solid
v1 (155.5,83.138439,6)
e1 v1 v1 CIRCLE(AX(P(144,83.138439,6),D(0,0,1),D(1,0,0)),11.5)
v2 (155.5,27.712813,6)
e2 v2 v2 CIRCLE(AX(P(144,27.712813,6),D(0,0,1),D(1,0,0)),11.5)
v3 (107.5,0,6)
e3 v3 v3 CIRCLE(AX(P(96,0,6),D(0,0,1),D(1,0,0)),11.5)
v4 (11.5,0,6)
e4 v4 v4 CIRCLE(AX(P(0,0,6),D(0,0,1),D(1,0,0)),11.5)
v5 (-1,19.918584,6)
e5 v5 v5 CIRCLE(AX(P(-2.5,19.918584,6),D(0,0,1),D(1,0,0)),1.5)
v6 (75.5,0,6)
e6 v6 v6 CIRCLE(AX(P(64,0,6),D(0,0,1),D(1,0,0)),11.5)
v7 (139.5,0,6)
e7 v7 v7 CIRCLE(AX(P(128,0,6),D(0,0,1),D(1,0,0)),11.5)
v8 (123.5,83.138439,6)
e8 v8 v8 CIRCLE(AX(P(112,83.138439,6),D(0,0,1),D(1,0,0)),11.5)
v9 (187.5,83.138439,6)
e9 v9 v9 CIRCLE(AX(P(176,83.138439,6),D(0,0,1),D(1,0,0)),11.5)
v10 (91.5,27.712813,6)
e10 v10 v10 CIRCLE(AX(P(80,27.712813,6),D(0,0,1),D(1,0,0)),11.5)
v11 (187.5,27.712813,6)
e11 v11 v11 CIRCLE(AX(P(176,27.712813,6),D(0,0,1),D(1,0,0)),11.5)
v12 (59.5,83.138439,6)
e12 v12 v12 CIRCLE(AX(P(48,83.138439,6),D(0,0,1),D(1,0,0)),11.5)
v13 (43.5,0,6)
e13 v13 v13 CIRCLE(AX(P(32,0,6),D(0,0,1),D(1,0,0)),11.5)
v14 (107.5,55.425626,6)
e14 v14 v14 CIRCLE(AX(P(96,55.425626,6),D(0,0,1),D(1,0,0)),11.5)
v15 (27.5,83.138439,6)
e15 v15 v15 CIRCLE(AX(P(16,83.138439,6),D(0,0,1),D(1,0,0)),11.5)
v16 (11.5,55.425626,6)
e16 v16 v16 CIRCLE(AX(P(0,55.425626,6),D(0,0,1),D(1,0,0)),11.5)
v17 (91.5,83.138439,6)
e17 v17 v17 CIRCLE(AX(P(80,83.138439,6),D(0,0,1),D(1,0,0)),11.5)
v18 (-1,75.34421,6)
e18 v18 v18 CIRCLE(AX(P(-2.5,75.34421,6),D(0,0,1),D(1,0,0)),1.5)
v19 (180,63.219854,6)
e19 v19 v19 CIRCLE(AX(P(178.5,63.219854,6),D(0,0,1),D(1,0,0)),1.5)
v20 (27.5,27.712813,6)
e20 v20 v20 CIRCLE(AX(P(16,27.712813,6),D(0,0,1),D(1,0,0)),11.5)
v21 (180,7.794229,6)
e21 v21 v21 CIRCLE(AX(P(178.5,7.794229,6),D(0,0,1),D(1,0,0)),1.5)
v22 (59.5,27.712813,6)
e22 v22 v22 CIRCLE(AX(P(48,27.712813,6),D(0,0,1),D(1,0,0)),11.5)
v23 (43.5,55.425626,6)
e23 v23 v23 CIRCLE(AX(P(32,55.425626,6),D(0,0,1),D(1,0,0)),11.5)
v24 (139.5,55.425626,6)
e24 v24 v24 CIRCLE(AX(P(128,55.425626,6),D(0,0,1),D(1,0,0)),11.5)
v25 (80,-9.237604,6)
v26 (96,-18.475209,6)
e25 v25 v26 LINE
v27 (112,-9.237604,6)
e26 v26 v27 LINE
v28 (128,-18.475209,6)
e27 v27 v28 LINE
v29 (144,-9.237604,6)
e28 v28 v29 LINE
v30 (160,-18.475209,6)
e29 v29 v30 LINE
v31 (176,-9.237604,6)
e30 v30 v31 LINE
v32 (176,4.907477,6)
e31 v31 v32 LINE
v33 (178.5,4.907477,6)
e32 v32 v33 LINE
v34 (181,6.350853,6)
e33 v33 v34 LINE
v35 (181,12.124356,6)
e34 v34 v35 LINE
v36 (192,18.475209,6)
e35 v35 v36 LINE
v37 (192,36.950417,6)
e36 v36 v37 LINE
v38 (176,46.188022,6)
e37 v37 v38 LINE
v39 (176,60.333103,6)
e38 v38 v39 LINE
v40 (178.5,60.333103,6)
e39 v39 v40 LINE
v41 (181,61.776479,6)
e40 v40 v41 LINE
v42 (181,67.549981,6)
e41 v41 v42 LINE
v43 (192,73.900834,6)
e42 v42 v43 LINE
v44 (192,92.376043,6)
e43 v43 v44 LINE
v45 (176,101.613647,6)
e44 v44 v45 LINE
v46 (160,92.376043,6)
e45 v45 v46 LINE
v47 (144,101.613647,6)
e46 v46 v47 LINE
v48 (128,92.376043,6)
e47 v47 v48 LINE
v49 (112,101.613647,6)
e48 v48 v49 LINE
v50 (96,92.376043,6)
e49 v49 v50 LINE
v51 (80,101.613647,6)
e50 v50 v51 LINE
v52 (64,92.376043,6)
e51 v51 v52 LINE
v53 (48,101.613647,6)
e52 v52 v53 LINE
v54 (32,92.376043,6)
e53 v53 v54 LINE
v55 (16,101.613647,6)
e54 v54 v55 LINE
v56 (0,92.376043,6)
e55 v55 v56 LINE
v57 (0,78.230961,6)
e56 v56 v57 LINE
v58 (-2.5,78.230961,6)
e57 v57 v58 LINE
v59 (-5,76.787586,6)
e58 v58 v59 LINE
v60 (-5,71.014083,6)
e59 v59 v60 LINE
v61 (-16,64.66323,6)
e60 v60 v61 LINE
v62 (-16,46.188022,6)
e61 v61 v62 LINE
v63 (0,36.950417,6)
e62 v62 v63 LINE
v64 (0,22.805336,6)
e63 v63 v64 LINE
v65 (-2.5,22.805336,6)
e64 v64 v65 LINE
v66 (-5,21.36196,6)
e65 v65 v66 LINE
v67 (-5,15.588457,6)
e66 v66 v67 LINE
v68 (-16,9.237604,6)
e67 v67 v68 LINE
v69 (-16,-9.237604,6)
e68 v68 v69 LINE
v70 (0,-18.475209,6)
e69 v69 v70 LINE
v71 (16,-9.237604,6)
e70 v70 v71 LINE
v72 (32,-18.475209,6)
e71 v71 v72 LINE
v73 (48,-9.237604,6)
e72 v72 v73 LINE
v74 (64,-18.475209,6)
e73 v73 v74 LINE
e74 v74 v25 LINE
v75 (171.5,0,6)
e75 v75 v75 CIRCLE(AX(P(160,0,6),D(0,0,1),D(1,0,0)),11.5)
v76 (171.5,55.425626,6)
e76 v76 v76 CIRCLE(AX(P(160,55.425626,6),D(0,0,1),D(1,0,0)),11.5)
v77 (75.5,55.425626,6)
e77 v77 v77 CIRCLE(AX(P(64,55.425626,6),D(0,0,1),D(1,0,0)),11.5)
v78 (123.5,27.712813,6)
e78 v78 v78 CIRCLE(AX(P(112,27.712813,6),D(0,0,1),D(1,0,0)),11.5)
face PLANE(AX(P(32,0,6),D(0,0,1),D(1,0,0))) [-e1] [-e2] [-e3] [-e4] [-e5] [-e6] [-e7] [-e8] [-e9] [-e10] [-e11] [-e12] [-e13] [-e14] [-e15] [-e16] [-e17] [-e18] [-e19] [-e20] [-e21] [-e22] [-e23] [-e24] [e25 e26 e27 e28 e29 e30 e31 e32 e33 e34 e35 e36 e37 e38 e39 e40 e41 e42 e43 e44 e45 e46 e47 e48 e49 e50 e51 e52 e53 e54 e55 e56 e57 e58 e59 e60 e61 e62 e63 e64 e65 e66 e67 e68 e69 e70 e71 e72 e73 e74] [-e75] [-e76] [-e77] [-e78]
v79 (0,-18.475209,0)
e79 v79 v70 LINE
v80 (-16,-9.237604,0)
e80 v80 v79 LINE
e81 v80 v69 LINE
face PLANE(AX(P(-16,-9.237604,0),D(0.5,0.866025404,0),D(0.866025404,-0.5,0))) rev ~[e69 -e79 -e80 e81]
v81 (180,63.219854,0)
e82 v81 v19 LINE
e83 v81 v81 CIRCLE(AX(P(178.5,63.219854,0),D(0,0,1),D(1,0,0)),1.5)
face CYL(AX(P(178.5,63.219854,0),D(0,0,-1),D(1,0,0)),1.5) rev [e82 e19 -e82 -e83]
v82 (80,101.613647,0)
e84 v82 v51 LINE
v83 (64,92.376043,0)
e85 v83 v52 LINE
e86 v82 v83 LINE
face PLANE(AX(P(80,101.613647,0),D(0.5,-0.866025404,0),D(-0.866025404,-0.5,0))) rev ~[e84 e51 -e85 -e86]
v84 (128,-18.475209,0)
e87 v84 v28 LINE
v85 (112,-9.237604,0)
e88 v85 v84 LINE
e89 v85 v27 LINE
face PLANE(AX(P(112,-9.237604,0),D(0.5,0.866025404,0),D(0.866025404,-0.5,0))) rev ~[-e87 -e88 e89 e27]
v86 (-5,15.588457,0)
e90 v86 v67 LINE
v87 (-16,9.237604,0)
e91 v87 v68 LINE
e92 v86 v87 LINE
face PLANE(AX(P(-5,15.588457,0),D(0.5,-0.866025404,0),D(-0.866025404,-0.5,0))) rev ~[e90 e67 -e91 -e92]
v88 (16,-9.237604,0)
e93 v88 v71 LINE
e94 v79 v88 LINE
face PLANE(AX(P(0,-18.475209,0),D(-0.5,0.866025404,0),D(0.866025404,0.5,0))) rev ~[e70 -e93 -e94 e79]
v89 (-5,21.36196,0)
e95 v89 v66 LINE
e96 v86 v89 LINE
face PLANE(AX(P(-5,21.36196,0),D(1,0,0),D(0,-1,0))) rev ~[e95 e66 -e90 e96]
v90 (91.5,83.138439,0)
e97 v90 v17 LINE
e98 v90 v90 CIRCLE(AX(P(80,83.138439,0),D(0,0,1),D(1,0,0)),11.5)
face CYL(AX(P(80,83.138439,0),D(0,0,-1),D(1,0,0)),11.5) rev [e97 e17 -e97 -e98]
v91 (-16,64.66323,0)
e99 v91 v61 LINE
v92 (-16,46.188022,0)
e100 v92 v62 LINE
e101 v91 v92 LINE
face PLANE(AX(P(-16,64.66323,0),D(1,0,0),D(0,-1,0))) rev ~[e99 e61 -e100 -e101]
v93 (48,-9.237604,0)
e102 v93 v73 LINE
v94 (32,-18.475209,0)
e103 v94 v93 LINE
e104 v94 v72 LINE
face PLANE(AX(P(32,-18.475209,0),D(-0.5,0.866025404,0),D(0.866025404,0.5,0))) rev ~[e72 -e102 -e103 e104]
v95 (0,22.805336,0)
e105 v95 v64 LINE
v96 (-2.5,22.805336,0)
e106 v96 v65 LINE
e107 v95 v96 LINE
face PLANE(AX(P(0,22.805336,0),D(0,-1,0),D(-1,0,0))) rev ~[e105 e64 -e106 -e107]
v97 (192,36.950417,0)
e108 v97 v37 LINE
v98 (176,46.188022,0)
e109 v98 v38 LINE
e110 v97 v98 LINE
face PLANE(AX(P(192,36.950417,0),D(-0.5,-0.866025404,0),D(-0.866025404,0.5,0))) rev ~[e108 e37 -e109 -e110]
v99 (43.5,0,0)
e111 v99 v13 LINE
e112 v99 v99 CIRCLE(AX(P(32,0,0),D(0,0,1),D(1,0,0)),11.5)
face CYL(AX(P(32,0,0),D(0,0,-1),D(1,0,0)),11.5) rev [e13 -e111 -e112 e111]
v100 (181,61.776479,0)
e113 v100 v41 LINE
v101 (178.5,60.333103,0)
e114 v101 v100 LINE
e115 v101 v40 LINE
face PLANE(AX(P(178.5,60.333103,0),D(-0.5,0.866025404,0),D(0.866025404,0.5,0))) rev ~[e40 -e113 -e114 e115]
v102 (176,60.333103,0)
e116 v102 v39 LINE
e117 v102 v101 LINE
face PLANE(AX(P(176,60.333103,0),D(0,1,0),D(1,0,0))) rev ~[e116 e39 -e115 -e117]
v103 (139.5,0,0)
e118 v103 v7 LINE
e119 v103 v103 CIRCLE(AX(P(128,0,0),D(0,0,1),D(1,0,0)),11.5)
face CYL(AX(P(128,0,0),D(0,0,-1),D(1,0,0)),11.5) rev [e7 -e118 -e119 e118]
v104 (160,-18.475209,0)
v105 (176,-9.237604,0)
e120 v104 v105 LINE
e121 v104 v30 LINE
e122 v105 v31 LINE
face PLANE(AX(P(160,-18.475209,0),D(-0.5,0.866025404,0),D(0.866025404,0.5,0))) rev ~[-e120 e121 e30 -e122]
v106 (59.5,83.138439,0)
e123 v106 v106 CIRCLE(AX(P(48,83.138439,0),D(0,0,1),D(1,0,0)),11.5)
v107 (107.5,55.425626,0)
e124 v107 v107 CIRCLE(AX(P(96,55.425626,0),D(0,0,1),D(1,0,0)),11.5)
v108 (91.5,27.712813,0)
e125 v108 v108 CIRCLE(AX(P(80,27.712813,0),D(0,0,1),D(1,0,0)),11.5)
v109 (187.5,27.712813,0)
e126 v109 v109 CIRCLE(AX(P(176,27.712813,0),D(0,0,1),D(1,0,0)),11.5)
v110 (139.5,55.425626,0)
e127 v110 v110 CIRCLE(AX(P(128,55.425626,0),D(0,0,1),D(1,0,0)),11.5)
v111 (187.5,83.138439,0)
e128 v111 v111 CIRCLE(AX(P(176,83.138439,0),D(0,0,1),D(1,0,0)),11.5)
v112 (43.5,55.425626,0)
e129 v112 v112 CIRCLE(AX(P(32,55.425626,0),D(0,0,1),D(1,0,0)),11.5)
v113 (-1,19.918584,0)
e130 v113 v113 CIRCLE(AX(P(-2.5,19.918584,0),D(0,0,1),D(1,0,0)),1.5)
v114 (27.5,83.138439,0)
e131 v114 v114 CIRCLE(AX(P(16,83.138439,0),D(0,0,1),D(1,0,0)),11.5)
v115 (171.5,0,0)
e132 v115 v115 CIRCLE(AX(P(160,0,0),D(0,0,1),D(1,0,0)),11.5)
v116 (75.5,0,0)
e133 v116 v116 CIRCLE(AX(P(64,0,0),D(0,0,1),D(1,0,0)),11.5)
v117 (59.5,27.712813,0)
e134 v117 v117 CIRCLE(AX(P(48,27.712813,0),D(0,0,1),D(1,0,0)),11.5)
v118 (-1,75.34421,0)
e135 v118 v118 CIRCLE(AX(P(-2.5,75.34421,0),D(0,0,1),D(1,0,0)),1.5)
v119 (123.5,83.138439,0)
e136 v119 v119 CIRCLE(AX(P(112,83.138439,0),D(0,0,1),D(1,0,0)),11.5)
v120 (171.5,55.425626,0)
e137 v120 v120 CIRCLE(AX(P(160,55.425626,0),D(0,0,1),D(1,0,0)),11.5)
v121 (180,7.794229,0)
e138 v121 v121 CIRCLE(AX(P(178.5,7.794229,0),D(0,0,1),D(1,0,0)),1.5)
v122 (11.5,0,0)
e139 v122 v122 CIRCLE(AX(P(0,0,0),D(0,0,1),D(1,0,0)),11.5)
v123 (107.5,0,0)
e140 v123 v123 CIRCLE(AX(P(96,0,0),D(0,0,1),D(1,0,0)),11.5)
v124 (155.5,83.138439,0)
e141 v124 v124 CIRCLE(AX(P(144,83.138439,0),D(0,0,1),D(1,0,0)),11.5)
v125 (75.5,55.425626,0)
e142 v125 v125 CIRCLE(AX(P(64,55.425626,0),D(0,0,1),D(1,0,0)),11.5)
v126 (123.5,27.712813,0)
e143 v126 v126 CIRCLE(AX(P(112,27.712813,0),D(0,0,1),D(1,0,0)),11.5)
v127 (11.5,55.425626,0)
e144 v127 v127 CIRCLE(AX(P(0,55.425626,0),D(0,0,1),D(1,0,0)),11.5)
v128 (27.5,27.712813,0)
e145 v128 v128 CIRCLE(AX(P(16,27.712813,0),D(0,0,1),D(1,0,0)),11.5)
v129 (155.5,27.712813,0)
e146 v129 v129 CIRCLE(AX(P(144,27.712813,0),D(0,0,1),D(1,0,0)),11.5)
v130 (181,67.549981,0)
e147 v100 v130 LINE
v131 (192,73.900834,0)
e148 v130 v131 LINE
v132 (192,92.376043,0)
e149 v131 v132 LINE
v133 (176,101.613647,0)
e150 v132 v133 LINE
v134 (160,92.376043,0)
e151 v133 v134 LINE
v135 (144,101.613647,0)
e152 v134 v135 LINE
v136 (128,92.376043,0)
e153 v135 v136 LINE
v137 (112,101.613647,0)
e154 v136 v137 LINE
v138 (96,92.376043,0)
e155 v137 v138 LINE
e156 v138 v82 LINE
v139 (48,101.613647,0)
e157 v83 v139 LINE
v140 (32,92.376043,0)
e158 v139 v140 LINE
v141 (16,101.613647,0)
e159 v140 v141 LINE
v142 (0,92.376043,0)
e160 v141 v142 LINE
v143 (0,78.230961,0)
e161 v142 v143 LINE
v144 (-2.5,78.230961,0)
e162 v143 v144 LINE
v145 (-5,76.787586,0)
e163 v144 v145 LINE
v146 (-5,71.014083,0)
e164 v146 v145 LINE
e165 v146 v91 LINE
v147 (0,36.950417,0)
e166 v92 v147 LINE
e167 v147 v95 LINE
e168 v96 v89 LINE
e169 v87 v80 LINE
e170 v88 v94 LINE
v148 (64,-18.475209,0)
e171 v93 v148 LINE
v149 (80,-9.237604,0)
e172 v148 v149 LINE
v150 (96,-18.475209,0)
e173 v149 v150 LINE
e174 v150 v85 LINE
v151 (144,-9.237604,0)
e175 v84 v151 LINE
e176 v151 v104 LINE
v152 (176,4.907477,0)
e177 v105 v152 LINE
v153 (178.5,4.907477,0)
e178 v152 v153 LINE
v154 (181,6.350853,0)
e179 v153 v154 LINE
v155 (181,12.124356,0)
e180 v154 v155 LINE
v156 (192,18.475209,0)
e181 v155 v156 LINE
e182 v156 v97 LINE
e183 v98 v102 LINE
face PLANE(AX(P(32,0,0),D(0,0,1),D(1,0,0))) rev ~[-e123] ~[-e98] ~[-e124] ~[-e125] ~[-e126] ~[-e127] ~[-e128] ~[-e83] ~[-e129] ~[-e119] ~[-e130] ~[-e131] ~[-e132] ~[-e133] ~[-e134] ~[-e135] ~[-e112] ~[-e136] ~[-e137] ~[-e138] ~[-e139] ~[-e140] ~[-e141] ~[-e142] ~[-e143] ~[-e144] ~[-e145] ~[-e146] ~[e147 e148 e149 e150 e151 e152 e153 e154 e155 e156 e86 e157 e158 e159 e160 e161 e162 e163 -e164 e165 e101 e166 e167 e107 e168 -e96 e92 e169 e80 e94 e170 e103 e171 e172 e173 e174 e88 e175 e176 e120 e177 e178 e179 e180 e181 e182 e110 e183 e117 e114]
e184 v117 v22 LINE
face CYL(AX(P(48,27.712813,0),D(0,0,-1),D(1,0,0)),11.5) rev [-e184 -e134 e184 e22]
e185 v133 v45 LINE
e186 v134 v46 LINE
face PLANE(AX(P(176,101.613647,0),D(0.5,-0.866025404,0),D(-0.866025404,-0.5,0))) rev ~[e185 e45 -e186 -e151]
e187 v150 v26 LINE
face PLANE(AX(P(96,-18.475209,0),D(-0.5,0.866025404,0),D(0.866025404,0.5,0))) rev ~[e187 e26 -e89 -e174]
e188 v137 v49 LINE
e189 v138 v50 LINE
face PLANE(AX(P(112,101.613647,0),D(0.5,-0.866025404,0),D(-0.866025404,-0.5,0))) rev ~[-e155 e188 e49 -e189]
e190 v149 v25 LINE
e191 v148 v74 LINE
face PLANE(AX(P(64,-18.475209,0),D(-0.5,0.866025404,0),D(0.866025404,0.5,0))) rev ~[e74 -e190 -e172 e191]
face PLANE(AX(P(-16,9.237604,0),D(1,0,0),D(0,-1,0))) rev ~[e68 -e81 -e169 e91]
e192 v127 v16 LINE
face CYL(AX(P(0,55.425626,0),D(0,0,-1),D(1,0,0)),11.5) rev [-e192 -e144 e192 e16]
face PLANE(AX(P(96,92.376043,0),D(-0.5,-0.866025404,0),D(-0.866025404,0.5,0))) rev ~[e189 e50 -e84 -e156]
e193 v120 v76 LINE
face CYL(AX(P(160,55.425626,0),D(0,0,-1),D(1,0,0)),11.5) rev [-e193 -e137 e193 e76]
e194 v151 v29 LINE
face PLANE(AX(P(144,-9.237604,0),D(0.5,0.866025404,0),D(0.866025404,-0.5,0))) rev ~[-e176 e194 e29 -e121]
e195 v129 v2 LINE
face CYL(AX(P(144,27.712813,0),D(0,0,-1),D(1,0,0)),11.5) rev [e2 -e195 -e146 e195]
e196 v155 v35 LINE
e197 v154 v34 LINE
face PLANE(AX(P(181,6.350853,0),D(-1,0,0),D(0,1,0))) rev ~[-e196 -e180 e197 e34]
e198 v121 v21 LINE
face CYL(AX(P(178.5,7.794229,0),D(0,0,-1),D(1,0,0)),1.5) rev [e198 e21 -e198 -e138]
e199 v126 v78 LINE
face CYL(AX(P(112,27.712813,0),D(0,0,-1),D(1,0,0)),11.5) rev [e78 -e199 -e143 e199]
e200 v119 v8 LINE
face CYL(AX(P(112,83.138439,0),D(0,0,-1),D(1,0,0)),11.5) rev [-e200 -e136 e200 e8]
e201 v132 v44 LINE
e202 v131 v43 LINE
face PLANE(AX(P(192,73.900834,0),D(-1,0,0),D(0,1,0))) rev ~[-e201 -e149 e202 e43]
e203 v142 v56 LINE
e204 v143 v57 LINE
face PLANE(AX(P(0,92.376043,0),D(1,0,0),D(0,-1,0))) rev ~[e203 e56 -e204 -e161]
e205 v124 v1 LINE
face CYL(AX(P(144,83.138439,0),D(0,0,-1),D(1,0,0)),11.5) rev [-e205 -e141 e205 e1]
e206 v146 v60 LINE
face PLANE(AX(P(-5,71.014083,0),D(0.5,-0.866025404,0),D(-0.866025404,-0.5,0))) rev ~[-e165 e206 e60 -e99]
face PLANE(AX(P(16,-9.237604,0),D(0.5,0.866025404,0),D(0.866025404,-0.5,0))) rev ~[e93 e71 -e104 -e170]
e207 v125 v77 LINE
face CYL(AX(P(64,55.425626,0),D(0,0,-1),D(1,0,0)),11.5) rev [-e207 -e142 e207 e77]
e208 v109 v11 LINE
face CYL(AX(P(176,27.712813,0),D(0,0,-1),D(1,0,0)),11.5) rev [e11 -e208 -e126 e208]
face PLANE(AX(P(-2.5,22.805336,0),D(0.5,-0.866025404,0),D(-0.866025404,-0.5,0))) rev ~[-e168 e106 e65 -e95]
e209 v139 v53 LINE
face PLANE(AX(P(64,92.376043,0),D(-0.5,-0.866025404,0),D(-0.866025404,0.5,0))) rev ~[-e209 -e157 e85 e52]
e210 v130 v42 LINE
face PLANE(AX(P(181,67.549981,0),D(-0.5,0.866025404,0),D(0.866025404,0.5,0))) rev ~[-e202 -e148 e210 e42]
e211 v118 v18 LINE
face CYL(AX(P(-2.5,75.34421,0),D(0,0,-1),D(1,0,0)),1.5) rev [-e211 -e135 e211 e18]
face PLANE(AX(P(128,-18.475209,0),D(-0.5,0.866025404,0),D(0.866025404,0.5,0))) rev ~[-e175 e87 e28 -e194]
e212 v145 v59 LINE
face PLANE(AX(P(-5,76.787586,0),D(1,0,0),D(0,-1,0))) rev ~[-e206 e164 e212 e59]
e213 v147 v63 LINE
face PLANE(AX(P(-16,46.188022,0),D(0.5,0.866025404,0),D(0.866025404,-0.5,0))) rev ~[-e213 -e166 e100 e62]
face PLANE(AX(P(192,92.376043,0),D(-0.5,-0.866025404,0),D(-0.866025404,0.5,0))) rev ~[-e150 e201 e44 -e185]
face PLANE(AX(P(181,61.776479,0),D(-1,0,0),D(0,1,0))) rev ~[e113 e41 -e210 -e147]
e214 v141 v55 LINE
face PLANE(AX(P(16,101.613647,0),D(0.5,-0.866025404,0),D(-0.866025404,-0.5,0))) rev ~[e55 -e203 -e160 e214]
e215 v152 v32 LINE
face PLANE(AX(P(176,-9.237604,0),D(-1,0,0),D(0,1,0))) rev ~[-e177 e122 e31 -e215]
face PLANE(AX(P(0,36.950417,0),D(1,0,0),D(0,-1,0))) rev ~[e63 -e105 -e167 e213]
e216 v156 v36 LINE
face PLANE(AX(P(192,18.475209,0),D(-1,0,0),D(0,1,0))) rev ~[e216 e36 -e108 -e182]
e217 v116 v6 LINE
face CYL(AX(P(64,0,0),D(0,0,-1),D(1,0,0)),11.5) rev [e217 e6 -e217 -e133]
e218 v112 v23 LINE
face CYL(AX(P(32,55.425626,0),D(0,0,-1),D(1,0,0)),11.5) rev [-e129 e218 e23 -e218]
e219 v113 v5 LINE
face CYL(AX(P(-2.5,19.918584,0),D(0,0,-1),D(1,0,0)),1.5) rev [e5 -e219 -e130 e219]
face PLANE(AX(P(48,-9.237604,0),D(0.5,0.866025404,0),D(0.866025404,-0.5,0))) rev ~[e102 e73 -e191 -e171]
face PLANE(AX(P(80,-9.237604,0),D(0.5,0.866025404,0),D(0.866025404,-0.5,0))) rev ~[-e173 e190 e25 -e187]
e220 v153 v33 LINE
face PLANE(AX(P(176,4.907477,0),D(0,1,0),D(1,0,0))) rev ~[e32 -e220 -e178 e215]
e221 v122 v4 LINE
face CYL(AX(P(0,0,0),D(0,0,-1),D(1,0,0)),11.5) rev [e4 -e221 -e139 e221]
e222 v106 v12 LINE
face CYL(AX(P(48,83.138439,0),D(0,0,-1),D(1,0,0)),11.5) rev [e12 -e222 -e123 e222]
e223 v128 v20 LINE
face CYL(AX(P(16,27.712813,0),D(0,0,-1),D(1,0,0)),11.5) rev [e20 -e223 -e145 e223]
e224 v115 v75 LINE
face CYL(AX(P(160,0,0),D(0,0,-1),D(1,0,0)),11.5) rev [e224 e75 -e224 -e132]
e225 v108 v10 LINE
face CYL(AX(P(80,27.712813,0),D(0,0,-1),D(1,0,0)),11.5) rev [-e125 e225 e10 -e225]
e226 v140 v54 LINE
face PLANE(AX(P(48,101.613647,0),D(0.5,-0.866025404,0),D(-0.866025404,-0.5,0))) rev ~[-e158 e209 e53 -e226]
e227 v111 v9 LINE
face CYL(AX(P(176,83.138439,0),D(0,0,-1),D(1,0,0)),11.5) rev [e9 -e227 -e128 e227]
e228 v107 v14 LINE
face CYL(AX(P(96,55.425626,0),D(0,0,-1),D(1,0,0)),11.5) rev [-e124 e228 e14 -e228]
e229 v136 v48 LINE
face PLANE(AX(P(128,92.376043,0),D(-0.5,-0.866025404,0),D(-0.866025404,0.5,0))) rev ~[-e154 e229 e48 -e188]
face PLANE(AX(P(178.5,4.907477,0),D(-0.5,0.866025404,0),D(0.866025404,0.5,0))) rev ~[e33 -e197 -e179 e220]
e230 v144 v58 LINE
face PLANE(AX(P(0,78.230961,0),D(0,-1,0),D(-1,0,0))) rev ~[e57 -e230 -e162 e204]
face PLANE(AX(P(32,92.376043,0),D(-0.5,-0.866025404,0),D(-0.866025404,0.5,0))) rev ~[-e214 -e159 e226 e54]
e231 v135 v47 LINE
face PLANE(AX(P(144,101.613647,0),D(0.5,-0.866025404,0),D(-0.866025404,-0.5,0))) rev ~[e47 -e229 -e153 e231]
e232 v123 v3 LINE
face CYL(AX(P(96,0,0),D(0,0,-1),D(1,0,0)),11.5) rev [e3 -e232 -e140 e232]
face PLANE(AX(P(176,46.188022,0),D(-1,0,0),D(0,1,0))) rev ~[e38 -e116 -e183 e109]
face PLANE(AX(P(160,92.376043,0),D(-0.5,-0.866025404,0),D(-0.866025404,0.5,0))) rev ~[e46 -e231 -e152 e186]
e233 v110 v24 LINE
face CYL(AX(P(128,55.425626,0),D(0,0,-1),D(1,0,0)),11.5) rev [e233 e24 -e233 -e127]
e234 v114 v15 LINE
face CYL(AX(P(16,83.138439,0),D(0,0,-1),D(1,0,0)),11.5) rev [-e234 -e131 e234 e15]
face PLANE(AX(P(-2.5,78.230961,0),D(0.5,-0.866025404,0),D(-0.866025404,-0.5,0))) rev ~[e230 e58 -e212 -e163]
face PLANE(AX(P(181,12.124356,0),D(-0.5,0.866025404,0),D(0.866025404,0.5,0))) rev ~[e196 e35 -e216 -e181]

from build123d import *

# Parameters (mm, degrees)
F0_R     = 11.5
F0_R_2   = 1.5
F1_DEPTH = 6
F2_DEPTH = 6


# Not quite as in the source:
# - a feature names something its author has since deleted; it is built from what else it names


with BuildPart() as f1:
    # F0 (on Top) → F1 (new body)
    with BuildSketch(Plane.XY):
        Polygon((32, 18.4752086141), (16, 9.237604307), (16, -9.237604307), (32, -18.4752086141), (48, -9.237604307), (48, 9.237604307), align=None)
        with Locations((32, 0)):
            Circle(F0_R, mode=Mode.SUBTRACT)
        Polygon((16, -9.237604307), (16, 9.237604307), (0, 18.4752086141), (-2.5, 17.0318329411), (-5, 15.5884572681), (-16, 9.237604307), (-16, -9.237604307), (0, -18.4752086141), align=None)
        Circle(F0_R, mode=Mode.SUBTRACT)
        Polygon((0, 18.4752086141), (16, 9.237604307), (32, 18.4752086141), (32, 36.9504172281), (16, 46.1880215352), (0, 36.9504172281), (0, 22.805335633), (0, 21.36195996), align=None)
        with Locations((16, 27.7128129211)):
            Circle(F0_R, mode=Mode.SUBTRACT)
        Polygon((-2.5, 17.0318329411), (0, 18.4752086141), (0, 21.36195996), (-2.5, 22.805335633), (-5, 21.36195996), (-5, 18.4752086141), align=None)
        with Locations((-2.5, 19.918584287)):
            Circle(F0_R_2, mode=Mode.SUBTRACT)
        Polygon((32, 36.9504172281), (32, 18.4752086141), (48, 9.237604307), (64, 18.4752086141), (64, 36.9504172281), (48, 46.1880215352), align=None)
        with Locations((48, 27.7128129211)):
            Circle(F0_R, mode=Mode.SUBTRACT)
        Polygon((64, 18.4752086141), (48, 9.237604307), (48, -9.237604307), (64, -18.4752086141), (80, -9.237604307), (80, 9.237604307), align=None)
        with Locations((64, 0)):
            Circle(F0_R, mode=Mode.SUBTRACT)
        Polygon((16, 46.1880215352), (32, 36.9504172281), (48, 46.1880215352), (48, 64.6632301492), (32, 73.9008344563), (16, 64.6632301492), align=None)
        with Locations((32, 55.4256258422)):
            Circle(F0_R, mode=Mode.SUBTRACT)
        Polygon((64, 36.9504172281), (64, 18.4752086141), (80, 9.237604307), (96, 18.4752086141), (96, 36.9504172281), (80, 46.1880215352), align=None)
        with Locations((80, 27.7128129211)):
            Circle(F0_R, mode=Mode.SUBTRACT)
        Polygon((0, 36.9504172281), (16, 46.1880215352), (16, 64.6632301492), (0, 73.9008344563), (-2.5, 72.4574587833), (-5, 71.0140831103), (-16, 64.6632301492), (-16, 46.1880215352), align=None)
        with Locations((0, 55.4256258422)):
            Circle(F0_R, mode=Mode.SUBTRACT)
        Polygon((48, 64.6632301492), (48, 46.1880215352), (64, 36.9504172281), (80, 46.1880215352), (80, 64.6632301492), (64, 73.9008344563), align=None)
        with Locations((64, 55.4256258422)):
            Circle(F0_R, mode=Mode.SUBTRACT)
        Polygon((96, 18.4752086141), (80, 9.237604307), (80, -9.237604307), (96, -18.4752086141), (112, -9.237604307), (112, 9.237604307), align=None)
        with Locations((96, 0)):
            Circle(F0_R, mode=Mode.SUBTRACT)
        Polygon((32, 73.9008344563), (48, 64.6632301492), (64, 73.9008344563), (64, 92.3760430703), (48, 101.6136473774), (32, 92.3760430703), align=None)
        with Locations((48, 83.1384387633)):
            Circle(F0_R, mode=Mode.SUBTRACT)
        Polygon((96, 36.9504172281), (96, 18.4752086141), (112, 9.237604307), (128, 18.4752086141), (128, 36.9504172281), (112, 46.1880215352), align=None)
        with Locations((112, 27.7128129211)):
            Circle(F0_R, mode=Mode.SUBTRACT)
        Polygon((80, 64.6632301492), (80, 46.1880215352), (96, 36.9504172281), (112, 46.1880215352), (112, 64.6632301492), (96, 73.9008344563), align=None)
        with Locations((96, 55.4256258422)):
            Circle(F0_R, mode=Mode.SUBTRACT)
        Polygon((-2.5, 72.4574587833), (0, 73.9008344563), (0, 76.7875858022), (-2.5, 78.2309614752), (-5, 76.7875858022), (-5, 73.9008344563), align=None)
        with Locations((-2.5, 75.3442101292)):
            Circle(F0_R_2, mode=Mode.SUBTRACT)
        Polygon((64, 92.3760430703), (64, 73.9008344563), (80, 64.6632301492), (96, 73.9008344563), (96, 92.3760430703), (80, 101.6136473774), align=None)
        with Locations((80, 83.1384387633)):
            Circle(F0_R, mode=Mode.SUBTRACT)
        Polygon((128, 18.4752086141), (112, 9.237604307), (112, -9.237604307), (128, -18.4752086141), (144, -9.237604307), (144, 9.237604307), align=None)
        with Locations((128, 0)):
            Circle(F0_R, mode=Mode.SUBTRACT)
        Polygon((128, 36.9504172281), (128, 18.4752086141), (144, 9.237604307), (160, 18.4752086141), (160, 36.9504172281), (144, 46.1880215352), align=None)
        with Locations((144, 27.7128129211)):
            Circle(F0_R, mode=Mode.SUBTRACT)
        Polygon((112, 64.6632301492), (112, 46.1880215352), (128, 36.9504172281), (144, 46.1880215352), (144, 64.6632301492), (128, 73.9008344563), align=None)
        with Locations((128, 55.4256258422)):
            Circle(F0_R, mode=Mode.SUBTRACT)
        Polygon((96, 92.3760430703), (96, 73.9008344563), (112, 64.6632301492), (128, 73.9008344563), (128, 92.3760430703), (112, 101.6136473774), align=None)
        with Locations((112, 83.1384387633)):
            Circle(F0_R, mode=Mode.SUBTRACT)
        Polygon((160, 18.4752086141), (144, 9.237604307), (144, -9.237604307), (160, -18.4752086141), (176, -9.237604307), (176, 4.9074772881), (176, 6.3508529611), (176, 9.237604307), align=None)
        with Locations((160, 0)):
            Circle(F0_R, mode=Mode.SUBTRACT)
        Polygon((160, 36.9504172281), (160, 18.4752086141), (176, 9.237604307), (178.5, 10.68097998), (181, 12.124355653), (192, 18.4752086141), (192, 36.9504172281), (176, 46.1880215352), align=None)
        with Locations((176, 27.7128129211)):
            Circle(F0_R, mode=Mode.SUBTRACT)
        Polygon((144, 64.6632301492), (144, 46.1880215352), (160, 36.9504172281), (176, 46.1880215352), (176, 60.3331031303), (176, 61.7764788033), (176, 64.6632301492), (160, 73.9008344563), align=None)
        with Locations((160, 55.4256258422)):
            Circle(F0_R, mode=Mode.SUBTRACT)
        Polygon((128, 92.3760430703), (128, 73.9008344563), (144, 64.6632301492), (160, 73.9008344563), (160, 92.3760430703), (144, 101.6136473774), align=None)
        with Locations((144, 83.1384387633)):
            Circle(F0_R, mode=Mode.SUBTRACT)
        Polygon((160, 92.3760430703), (160, 73.9008344563), (176, 64.6632301492), (178.5, 66.1066058222), (181, 67.5499814952), (192, 73.9008344563), (192, 92.3760430703), (176, 101.6136473774), align=None)
        with Locations((176, 83.1384387633)):
            Circle(F0_R, mode=Mode.SUBTRACT)
    extrude(amount=F1_DEPTH)

    # F0 (on Top) → F2 (join)
    with BuildSketch(Plane.XY):
        Polygon((0, 18.4752086141), (16, 9.237604307), (32, 18.4752086141), (32, 36.9504172281), (16, 46.1880215352), (0, 36.9504172281), (0, 22.805335633), (0, 21.36195996), align=None)
        with Locations((16, 27.7128129211)):
            Circle(F0_R, mode=Mode.SUBTRACT)
        Polygon((0, 73.9008344563), (16, 64.6632301492), (32, 73.9008344563), (32, 92.3760430703), (16, 101.6136473774), (0, 92.3760430703), (0, 78.2309614752), (0, 76.7875858022), align=None)
        with Locations((16, 83.1384387633)):
            Circle(F0_R, mode=Mode.SUBTRACT)
        Polygon((178.5, 10.68097998), (176, 9.237604307), (176, 6.3508529611), (178.5, 4.9074772881), (181, 6.3508529611), (181, 9.237604307), align=None)
        with Locations((178.5, 7.7942286341)):
            Circle(F0_R_2, mode=Mode.SUBTRACT)
        Polygon((178.5, 66.1066058222), (176, 64.6632301492), (176, 61.7764788033), (178.5, 60.3331031303), (181, 61.7764788033), (181, 64.6632301492), align=None)
        with Locations((178.5, 63.2198544763)):
            Circle(F0_R_2, mode=Mode.SUBTRACT)
        Polygon((-5, 71.0140831103), (-2.5, 72.4574587833), (-5, 73.9008344563), align=None)
        Polygon((-2.5, 78.2309614752), (0, 76.7875858022), (0, 78.2309614752), align=None)
        Polygon((-2.5, 22.805335633), (0, 21.36195996), (0, 22.805335633), align=None)
        Polygon((-5, 15.5884572681), (-2.5, 17.0318329411), (-5, 18.4752086141), align=None)
        Polygon((176, 61.7764788033), (176, 60.3331031303), (178.5, 60.3331031303), align=None)
        Polygon((181, 67.5499814952), (178.5, 66.1066058222), (181, 64.6632301492), align=None)
        Polygon((178.5, 4.9074772881), (176, 6.3508529611), (176, 4.9074772881), align=None)
        Polygon((181, 12.124355653), (178.5, 10.68097998), (181, 9.237604307), align=None)
    extrude(amount=F2_DEPTH)


solid = f1.part
